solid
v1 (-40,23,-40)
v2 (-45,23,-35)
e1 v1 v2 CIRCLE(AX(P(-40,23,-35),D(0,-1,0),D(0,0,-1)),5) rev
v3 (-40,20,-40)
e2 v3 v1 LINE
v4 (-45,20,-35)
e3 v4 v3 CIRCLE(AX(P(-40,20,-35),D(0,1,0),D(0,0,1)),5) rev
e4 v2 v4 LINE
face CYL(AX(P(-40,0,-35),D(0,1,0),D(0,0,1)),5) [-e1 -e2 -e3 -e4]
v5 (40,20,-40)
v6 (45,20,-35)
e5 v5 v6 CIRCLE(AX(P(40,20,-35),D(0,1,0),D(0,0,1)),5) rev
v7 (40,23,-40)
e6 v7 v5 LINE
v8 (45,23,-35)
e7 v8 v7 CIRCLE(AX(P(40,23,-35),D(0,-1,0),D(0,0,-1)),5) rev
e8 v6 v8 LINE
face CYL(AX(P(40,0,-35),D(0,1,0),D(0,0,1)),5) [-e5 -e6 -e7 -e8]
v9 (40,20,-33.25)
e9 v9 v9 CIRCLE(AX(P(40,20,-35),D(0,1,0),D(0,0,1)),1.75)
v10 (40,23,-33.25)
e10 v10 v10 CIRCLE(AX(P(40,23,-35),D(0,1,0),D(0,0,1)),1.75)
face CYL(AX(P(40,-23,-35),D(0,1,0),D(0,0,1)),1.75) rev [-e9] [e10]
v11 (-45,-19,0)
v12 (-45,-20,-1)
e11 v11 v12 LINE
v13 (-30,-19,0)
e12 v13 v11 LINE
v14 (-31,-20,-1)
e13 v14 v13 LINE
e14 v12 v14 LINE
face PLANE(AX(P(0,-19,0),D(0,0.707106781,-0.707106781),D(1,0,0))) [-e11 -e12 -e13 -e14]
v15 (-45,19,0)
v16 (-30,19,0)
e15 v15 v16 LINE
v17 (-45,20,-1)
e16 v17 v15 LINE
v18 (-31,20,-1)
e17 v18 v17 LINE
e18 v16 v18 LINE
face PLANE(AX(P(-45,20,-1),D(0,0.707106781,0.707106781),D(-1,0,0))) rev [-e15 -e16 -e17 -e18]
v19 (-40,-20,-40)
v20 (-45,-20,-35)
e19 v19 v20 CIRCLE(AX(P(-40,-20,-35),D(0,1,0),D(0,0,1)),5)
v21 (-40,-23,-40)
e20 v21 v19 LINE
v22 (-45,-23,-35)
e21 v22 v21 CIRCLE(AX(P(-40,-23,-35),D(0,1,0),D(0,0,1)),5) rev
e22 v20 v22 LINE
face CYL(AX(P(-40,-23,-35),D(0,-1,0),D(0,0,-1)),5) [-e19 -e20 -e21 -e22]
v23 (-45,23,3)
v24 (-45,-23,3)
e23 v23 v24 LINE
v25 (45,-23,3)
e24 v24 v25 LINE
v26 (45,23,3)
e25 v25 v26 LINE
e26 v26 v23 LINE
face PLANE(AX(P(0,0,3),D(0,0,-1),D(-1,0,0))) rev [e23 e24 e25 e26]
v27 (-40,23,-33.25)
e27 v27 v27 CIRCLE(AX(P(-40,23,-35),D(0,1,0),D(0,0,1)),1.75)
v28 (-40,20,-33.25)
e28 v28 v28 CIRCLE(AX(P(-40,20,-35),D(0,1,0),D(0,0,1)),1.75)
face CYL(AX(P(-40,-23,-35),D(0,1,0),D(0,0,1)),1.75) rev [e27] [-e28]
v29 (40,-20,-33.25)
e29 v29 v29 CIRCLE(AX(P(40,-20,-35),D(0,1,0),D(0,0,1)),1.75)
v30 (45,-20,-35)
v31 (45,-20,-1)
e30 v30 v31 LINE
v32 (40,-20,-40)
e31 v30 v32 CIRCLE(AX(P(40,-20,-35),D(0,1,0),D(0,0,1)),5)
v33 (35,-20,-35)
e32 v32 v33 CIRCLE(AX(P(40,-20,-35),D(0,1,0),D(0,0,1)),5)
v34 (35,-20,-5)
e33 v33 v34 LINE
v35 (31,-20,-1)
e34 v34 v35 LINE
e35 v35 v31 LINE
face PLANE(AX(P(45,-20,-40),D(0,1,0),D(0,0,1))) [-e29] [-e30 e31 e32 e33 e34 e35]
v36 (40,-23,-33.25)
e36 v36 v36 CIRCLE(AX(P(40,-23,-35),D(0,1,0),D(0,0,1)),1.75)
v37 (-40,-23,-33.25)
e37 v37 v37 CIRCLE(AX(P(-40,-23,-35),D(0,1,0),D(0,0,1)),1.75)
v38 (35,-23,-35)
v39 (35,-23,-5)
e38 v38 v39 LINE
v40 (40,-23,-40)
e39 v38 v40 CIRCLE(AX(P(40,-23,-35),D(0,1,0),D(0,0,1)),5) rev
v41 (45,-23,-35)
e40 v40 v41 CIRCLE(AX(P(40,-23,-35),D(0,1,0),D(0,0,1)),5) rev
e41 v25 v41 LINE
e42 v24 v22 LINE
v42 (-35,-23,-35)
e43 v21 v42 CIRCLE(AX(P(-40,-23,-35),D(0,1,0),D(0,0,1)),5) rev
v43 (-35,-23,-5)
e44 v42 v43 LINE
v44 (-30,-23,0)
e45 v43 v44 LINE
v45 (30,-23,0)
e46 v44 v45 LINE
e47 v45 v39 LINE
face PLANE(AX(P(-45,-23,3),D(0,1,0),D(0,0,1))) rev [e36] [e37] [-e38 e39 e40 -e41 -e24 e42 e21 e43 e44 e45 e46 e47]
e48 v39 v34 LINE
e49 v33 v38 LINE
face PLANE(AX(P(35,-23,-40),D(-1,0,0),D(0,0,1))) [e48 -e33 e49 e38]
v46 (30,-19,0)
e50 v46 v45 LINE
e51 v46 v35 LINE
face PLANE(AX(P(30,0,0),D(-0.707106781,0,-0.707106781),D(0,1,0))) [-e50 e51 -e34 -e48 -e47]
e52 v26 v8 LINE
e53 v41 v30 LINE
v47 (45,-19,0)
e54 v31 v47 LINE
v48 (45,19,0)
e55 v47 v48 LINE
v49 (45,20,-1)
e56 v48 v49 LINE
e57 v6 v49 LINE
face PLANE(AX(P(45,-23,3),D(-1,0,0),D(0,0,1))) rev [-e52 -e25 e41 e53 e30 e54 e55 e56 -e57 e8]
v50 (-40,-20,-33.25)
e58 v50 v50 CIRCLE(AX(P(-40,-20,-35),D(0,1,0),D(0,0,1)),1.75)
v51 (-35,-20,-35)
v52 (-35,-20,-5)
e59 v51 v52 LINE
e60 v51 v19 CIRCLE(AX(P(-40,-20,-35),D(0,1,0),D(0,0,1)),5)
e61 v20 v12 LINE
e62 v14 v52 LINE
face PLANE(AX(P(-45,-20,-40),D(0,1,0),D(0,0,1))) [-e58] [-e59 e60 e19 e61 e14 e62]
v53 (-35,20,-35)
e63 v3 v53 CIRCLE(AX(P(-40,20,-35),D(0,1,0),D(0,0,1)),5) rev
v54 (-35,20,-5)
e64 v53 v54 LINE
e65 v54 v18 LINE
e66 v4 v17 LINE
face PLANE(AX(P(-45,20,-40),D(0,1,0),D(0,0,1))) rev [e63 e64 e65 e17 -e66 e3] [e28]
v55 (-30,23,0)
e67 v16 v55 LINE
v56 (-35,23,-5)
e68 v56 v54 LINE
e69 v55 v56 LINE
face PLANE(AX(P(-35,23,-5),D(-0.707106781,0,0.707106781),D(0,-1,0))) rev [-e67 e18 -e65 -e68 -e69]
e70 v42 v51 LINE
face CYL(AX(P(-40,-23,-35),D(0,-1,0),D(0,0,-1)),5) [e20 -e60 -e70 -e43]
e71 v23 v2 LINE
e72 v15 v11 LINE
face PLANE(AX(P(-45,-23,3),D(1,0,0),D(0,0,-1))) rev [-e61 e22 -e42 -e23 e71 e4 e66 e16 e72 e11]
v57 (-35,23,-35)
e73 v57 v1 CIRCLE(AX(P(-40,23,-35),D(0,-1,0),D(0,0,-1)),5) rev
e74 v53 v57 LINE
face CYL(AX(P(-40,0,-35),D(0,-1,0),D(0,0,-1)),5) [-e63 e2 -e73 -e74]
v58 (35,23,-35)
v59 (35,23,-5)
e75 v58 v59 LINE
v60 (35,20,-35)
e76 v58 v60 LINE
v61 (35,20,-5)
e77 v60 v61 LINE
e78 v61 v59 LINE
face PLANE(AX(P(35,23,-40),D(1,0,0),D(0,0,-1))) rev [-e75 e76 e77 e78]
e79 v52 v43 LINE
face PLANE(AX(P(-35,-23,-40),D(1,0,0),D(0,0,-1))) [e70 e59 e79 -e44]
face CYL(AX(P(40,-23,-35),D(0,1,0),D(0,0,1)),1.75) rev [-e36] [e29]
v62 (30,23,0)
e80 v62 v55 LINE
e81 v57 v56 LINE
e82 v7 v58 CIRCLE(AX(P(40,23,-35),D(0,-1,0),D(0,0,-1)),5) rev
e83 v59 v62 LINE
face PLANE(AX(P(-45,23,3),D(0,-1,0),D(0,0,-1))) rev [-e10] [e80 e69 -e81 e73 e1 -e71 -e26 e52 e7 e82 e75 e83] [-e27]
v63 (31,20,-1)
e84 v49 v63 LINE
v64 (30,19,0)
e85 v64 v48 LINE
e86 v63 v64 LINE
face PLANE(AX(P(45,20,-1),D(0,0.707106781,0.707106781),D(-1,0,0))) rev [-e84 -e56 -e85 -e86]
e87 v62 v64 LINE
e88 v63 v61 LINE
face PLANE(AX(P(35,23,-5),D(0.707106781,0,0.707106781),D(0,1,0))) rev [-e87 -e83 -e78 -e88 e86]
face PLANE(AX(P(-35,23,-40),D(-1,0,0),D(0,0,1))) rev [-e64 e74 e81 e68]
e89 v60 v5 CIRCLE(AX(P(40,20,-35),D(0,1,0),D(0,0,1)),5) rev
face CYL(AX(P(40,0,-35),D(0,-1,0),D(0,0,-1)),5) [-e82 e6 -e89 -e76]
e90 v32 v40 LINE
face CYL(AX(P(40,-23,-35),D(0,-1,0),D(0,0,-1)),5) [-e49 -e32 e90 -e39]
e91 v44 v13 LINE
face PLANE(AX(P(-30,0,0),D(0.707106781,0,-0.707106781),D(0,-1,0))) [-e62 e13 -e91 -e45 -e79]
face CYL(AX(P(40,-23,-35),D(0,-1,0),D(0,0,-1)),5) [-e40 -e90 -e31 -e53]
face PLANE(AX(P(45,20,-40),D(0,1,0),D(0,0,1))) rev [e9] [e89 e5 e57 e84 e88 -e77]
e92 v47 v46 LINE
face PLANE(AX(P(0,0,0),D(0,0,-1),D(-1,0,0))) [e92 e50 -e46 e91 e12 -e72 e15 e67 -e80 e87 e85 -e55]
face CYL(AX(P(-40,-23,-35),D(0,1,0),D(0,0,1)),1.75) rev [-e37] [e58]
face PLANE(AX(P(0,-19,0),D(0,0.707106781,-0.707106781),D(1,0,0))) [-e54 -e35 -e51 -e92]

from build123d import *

# Parameters (mm, degrees)
SZKIC1_W                    = 90
SZKIC1_H                    = 46
DODANIE_WYCI_GNI_CIE1_DEPTH = 3
SZKIC2_W                    = 10
SZKIC2_H                    = 3
DODANIE_WYCI_GNI_CIE2_DEPTH = 40
SFAZOWANIE1_SIZE            = 5
SFAZOWANIE2_SIZE            = 1
ZAOKR_GLENIE1_R             = 5
SFAZOWANIE1_OF_LUSTRO1_SIZE = 5
SFAZOWANIE2_OF_LUSTRO1_SIZE = 1
ZAOKR_GLENIE1_OF_LUSTRO1_R  = 5
SZKIC3_R                    = 1.75
WYTNIJ_WYCI_GNI_CIE1_DEPTH  = 76.769386958


with BuildPart() as part:
    # Szkic1 → Dodanie-wyciągnięcie1 (new body)
    with BuildSketch(Plane.XY):
        Rectangle(SZKIC1_W, SZKIC1_H)
    extrude(amount=DODANIE_WYCI_GNI_CIE1_DEPTH)

    # Szkic2 → Dodanie-wyciągnięcie2 (add)
    with BuildSketch(Plane(origin=(0, 0, 0), x_dir=(-1, 0, 0), z_dir=(0, 0, -1))):
        with Locations((-40, 21.5)):
            Rectangle(SZKIC2_W, SZKIC2_H)
        with Locations((40, 21.5)):
            Rectangle(SZKIC2_W, SZKIC2_H)
    dodanie_wyci_gni_cie2 = extrude(amount=DODANIE_WYCI_GNI_CIE2_DEPTH)

    # Sfazowanie1
    sfazowanie1_edges = [part.edges().sort_by_distance(p)[0] for p in [
        (35, 21.5, 0),
        (-35, 21.5, 0),
    ]]
    chamfer(sfazowanie1_edges, length=SFAZOWANIE1_SIZE)

    # Sfazowanie2
    sfazowanie2_edges = [part.edges().sort_by_distance(p)[0] for p in [
        (37.5, 20, 0),
        (-37.5, 20, 0),
    ]]
    chamfer(sfazowanie2_edges, length=SFAZOWANIE2_SIZE)

    # Zaokrąglenie1
    zaokr_glenie1_edges = [part.edges().sort_by_distance(p)[0] for p in [
        (35, 21.5, -40),
        (45, 21.5, -40),
        (-35, 21.5, -40),
        (-45, 21.5, -40),
    ]]
    fillet(zaokr_glenie1_edges, radius=ZAOKR_GLENIE1_R - 0.0001)  # a hair under: the kernel refuses the full size

    # Lustro1: Dodanie-wyciągnięcie2 across plane
    add(dodanie_wyci_gni_cie2.mirror(Plane.ZX))

    # Sfazowanie1 of Lustro1
    sfazowanie1_of_lustro1_edges = [part.edges().sort_by_distance(p)[0] for p in [
        (35, -21.5, 0),
        (-35, -21.5, 0),
    ]]
    chamfer(sfazowanie1_of_lustro1_edges, length=SFAZOWANIE1_OF_LUSTRO1_SIZE)

    # Sfazowanie2 of Lustro1
    sfazowanie2_of_lustro1_edges = [part.edges().sort_by_distance(p)[0] for p in [
        (37.5, -20, 0),
        (-37.5, -20, 0),
    ]]
    chamfer(sfazowanie2_of_lustro1_edges, length=SFAZOWANIE2_OF_LUSTRO1_SIZE)

    # Zaokrąglenie1 of Lustro1
    zaokr_glenie1_of_lustro1_edges = [part.edges().sort_by_distance(p)[0] for p in [
        (35, -21.5, -40),
        (45, -21.5, -40),
        (-35, -21.5, -40),
        (-45, -21.5, -40),
    ]]
    fillet(zaokr_glenie1_of_lustro1_edges, radius=ZAOKR_GLENIE1_OF_LUSTRO1_R - 0.0001)  # a hair under: the kernel refuses the full size

    # Szkic3 → Wytnij-wyciągnięcie1 (cut, through all)
    with BuildSketch(Plane(origin=(0, 23, 0), x_dir=(1, 0, 0), z_dir=(0, 1, 0))):
        with Locations(Location((-40, 35, 0), (0, 0, 270))):
            Circle(SZKIC3_R)
        with Locations(Location((40, 35, 0), (0, 0, 270))):
            Circle(SZKIC3_R)
    extrude(amount=-WYTNIJ_WYCI_GNI_CIE1_DEPTH, mode=Mode.SUBTRACT)


solid = part.part
